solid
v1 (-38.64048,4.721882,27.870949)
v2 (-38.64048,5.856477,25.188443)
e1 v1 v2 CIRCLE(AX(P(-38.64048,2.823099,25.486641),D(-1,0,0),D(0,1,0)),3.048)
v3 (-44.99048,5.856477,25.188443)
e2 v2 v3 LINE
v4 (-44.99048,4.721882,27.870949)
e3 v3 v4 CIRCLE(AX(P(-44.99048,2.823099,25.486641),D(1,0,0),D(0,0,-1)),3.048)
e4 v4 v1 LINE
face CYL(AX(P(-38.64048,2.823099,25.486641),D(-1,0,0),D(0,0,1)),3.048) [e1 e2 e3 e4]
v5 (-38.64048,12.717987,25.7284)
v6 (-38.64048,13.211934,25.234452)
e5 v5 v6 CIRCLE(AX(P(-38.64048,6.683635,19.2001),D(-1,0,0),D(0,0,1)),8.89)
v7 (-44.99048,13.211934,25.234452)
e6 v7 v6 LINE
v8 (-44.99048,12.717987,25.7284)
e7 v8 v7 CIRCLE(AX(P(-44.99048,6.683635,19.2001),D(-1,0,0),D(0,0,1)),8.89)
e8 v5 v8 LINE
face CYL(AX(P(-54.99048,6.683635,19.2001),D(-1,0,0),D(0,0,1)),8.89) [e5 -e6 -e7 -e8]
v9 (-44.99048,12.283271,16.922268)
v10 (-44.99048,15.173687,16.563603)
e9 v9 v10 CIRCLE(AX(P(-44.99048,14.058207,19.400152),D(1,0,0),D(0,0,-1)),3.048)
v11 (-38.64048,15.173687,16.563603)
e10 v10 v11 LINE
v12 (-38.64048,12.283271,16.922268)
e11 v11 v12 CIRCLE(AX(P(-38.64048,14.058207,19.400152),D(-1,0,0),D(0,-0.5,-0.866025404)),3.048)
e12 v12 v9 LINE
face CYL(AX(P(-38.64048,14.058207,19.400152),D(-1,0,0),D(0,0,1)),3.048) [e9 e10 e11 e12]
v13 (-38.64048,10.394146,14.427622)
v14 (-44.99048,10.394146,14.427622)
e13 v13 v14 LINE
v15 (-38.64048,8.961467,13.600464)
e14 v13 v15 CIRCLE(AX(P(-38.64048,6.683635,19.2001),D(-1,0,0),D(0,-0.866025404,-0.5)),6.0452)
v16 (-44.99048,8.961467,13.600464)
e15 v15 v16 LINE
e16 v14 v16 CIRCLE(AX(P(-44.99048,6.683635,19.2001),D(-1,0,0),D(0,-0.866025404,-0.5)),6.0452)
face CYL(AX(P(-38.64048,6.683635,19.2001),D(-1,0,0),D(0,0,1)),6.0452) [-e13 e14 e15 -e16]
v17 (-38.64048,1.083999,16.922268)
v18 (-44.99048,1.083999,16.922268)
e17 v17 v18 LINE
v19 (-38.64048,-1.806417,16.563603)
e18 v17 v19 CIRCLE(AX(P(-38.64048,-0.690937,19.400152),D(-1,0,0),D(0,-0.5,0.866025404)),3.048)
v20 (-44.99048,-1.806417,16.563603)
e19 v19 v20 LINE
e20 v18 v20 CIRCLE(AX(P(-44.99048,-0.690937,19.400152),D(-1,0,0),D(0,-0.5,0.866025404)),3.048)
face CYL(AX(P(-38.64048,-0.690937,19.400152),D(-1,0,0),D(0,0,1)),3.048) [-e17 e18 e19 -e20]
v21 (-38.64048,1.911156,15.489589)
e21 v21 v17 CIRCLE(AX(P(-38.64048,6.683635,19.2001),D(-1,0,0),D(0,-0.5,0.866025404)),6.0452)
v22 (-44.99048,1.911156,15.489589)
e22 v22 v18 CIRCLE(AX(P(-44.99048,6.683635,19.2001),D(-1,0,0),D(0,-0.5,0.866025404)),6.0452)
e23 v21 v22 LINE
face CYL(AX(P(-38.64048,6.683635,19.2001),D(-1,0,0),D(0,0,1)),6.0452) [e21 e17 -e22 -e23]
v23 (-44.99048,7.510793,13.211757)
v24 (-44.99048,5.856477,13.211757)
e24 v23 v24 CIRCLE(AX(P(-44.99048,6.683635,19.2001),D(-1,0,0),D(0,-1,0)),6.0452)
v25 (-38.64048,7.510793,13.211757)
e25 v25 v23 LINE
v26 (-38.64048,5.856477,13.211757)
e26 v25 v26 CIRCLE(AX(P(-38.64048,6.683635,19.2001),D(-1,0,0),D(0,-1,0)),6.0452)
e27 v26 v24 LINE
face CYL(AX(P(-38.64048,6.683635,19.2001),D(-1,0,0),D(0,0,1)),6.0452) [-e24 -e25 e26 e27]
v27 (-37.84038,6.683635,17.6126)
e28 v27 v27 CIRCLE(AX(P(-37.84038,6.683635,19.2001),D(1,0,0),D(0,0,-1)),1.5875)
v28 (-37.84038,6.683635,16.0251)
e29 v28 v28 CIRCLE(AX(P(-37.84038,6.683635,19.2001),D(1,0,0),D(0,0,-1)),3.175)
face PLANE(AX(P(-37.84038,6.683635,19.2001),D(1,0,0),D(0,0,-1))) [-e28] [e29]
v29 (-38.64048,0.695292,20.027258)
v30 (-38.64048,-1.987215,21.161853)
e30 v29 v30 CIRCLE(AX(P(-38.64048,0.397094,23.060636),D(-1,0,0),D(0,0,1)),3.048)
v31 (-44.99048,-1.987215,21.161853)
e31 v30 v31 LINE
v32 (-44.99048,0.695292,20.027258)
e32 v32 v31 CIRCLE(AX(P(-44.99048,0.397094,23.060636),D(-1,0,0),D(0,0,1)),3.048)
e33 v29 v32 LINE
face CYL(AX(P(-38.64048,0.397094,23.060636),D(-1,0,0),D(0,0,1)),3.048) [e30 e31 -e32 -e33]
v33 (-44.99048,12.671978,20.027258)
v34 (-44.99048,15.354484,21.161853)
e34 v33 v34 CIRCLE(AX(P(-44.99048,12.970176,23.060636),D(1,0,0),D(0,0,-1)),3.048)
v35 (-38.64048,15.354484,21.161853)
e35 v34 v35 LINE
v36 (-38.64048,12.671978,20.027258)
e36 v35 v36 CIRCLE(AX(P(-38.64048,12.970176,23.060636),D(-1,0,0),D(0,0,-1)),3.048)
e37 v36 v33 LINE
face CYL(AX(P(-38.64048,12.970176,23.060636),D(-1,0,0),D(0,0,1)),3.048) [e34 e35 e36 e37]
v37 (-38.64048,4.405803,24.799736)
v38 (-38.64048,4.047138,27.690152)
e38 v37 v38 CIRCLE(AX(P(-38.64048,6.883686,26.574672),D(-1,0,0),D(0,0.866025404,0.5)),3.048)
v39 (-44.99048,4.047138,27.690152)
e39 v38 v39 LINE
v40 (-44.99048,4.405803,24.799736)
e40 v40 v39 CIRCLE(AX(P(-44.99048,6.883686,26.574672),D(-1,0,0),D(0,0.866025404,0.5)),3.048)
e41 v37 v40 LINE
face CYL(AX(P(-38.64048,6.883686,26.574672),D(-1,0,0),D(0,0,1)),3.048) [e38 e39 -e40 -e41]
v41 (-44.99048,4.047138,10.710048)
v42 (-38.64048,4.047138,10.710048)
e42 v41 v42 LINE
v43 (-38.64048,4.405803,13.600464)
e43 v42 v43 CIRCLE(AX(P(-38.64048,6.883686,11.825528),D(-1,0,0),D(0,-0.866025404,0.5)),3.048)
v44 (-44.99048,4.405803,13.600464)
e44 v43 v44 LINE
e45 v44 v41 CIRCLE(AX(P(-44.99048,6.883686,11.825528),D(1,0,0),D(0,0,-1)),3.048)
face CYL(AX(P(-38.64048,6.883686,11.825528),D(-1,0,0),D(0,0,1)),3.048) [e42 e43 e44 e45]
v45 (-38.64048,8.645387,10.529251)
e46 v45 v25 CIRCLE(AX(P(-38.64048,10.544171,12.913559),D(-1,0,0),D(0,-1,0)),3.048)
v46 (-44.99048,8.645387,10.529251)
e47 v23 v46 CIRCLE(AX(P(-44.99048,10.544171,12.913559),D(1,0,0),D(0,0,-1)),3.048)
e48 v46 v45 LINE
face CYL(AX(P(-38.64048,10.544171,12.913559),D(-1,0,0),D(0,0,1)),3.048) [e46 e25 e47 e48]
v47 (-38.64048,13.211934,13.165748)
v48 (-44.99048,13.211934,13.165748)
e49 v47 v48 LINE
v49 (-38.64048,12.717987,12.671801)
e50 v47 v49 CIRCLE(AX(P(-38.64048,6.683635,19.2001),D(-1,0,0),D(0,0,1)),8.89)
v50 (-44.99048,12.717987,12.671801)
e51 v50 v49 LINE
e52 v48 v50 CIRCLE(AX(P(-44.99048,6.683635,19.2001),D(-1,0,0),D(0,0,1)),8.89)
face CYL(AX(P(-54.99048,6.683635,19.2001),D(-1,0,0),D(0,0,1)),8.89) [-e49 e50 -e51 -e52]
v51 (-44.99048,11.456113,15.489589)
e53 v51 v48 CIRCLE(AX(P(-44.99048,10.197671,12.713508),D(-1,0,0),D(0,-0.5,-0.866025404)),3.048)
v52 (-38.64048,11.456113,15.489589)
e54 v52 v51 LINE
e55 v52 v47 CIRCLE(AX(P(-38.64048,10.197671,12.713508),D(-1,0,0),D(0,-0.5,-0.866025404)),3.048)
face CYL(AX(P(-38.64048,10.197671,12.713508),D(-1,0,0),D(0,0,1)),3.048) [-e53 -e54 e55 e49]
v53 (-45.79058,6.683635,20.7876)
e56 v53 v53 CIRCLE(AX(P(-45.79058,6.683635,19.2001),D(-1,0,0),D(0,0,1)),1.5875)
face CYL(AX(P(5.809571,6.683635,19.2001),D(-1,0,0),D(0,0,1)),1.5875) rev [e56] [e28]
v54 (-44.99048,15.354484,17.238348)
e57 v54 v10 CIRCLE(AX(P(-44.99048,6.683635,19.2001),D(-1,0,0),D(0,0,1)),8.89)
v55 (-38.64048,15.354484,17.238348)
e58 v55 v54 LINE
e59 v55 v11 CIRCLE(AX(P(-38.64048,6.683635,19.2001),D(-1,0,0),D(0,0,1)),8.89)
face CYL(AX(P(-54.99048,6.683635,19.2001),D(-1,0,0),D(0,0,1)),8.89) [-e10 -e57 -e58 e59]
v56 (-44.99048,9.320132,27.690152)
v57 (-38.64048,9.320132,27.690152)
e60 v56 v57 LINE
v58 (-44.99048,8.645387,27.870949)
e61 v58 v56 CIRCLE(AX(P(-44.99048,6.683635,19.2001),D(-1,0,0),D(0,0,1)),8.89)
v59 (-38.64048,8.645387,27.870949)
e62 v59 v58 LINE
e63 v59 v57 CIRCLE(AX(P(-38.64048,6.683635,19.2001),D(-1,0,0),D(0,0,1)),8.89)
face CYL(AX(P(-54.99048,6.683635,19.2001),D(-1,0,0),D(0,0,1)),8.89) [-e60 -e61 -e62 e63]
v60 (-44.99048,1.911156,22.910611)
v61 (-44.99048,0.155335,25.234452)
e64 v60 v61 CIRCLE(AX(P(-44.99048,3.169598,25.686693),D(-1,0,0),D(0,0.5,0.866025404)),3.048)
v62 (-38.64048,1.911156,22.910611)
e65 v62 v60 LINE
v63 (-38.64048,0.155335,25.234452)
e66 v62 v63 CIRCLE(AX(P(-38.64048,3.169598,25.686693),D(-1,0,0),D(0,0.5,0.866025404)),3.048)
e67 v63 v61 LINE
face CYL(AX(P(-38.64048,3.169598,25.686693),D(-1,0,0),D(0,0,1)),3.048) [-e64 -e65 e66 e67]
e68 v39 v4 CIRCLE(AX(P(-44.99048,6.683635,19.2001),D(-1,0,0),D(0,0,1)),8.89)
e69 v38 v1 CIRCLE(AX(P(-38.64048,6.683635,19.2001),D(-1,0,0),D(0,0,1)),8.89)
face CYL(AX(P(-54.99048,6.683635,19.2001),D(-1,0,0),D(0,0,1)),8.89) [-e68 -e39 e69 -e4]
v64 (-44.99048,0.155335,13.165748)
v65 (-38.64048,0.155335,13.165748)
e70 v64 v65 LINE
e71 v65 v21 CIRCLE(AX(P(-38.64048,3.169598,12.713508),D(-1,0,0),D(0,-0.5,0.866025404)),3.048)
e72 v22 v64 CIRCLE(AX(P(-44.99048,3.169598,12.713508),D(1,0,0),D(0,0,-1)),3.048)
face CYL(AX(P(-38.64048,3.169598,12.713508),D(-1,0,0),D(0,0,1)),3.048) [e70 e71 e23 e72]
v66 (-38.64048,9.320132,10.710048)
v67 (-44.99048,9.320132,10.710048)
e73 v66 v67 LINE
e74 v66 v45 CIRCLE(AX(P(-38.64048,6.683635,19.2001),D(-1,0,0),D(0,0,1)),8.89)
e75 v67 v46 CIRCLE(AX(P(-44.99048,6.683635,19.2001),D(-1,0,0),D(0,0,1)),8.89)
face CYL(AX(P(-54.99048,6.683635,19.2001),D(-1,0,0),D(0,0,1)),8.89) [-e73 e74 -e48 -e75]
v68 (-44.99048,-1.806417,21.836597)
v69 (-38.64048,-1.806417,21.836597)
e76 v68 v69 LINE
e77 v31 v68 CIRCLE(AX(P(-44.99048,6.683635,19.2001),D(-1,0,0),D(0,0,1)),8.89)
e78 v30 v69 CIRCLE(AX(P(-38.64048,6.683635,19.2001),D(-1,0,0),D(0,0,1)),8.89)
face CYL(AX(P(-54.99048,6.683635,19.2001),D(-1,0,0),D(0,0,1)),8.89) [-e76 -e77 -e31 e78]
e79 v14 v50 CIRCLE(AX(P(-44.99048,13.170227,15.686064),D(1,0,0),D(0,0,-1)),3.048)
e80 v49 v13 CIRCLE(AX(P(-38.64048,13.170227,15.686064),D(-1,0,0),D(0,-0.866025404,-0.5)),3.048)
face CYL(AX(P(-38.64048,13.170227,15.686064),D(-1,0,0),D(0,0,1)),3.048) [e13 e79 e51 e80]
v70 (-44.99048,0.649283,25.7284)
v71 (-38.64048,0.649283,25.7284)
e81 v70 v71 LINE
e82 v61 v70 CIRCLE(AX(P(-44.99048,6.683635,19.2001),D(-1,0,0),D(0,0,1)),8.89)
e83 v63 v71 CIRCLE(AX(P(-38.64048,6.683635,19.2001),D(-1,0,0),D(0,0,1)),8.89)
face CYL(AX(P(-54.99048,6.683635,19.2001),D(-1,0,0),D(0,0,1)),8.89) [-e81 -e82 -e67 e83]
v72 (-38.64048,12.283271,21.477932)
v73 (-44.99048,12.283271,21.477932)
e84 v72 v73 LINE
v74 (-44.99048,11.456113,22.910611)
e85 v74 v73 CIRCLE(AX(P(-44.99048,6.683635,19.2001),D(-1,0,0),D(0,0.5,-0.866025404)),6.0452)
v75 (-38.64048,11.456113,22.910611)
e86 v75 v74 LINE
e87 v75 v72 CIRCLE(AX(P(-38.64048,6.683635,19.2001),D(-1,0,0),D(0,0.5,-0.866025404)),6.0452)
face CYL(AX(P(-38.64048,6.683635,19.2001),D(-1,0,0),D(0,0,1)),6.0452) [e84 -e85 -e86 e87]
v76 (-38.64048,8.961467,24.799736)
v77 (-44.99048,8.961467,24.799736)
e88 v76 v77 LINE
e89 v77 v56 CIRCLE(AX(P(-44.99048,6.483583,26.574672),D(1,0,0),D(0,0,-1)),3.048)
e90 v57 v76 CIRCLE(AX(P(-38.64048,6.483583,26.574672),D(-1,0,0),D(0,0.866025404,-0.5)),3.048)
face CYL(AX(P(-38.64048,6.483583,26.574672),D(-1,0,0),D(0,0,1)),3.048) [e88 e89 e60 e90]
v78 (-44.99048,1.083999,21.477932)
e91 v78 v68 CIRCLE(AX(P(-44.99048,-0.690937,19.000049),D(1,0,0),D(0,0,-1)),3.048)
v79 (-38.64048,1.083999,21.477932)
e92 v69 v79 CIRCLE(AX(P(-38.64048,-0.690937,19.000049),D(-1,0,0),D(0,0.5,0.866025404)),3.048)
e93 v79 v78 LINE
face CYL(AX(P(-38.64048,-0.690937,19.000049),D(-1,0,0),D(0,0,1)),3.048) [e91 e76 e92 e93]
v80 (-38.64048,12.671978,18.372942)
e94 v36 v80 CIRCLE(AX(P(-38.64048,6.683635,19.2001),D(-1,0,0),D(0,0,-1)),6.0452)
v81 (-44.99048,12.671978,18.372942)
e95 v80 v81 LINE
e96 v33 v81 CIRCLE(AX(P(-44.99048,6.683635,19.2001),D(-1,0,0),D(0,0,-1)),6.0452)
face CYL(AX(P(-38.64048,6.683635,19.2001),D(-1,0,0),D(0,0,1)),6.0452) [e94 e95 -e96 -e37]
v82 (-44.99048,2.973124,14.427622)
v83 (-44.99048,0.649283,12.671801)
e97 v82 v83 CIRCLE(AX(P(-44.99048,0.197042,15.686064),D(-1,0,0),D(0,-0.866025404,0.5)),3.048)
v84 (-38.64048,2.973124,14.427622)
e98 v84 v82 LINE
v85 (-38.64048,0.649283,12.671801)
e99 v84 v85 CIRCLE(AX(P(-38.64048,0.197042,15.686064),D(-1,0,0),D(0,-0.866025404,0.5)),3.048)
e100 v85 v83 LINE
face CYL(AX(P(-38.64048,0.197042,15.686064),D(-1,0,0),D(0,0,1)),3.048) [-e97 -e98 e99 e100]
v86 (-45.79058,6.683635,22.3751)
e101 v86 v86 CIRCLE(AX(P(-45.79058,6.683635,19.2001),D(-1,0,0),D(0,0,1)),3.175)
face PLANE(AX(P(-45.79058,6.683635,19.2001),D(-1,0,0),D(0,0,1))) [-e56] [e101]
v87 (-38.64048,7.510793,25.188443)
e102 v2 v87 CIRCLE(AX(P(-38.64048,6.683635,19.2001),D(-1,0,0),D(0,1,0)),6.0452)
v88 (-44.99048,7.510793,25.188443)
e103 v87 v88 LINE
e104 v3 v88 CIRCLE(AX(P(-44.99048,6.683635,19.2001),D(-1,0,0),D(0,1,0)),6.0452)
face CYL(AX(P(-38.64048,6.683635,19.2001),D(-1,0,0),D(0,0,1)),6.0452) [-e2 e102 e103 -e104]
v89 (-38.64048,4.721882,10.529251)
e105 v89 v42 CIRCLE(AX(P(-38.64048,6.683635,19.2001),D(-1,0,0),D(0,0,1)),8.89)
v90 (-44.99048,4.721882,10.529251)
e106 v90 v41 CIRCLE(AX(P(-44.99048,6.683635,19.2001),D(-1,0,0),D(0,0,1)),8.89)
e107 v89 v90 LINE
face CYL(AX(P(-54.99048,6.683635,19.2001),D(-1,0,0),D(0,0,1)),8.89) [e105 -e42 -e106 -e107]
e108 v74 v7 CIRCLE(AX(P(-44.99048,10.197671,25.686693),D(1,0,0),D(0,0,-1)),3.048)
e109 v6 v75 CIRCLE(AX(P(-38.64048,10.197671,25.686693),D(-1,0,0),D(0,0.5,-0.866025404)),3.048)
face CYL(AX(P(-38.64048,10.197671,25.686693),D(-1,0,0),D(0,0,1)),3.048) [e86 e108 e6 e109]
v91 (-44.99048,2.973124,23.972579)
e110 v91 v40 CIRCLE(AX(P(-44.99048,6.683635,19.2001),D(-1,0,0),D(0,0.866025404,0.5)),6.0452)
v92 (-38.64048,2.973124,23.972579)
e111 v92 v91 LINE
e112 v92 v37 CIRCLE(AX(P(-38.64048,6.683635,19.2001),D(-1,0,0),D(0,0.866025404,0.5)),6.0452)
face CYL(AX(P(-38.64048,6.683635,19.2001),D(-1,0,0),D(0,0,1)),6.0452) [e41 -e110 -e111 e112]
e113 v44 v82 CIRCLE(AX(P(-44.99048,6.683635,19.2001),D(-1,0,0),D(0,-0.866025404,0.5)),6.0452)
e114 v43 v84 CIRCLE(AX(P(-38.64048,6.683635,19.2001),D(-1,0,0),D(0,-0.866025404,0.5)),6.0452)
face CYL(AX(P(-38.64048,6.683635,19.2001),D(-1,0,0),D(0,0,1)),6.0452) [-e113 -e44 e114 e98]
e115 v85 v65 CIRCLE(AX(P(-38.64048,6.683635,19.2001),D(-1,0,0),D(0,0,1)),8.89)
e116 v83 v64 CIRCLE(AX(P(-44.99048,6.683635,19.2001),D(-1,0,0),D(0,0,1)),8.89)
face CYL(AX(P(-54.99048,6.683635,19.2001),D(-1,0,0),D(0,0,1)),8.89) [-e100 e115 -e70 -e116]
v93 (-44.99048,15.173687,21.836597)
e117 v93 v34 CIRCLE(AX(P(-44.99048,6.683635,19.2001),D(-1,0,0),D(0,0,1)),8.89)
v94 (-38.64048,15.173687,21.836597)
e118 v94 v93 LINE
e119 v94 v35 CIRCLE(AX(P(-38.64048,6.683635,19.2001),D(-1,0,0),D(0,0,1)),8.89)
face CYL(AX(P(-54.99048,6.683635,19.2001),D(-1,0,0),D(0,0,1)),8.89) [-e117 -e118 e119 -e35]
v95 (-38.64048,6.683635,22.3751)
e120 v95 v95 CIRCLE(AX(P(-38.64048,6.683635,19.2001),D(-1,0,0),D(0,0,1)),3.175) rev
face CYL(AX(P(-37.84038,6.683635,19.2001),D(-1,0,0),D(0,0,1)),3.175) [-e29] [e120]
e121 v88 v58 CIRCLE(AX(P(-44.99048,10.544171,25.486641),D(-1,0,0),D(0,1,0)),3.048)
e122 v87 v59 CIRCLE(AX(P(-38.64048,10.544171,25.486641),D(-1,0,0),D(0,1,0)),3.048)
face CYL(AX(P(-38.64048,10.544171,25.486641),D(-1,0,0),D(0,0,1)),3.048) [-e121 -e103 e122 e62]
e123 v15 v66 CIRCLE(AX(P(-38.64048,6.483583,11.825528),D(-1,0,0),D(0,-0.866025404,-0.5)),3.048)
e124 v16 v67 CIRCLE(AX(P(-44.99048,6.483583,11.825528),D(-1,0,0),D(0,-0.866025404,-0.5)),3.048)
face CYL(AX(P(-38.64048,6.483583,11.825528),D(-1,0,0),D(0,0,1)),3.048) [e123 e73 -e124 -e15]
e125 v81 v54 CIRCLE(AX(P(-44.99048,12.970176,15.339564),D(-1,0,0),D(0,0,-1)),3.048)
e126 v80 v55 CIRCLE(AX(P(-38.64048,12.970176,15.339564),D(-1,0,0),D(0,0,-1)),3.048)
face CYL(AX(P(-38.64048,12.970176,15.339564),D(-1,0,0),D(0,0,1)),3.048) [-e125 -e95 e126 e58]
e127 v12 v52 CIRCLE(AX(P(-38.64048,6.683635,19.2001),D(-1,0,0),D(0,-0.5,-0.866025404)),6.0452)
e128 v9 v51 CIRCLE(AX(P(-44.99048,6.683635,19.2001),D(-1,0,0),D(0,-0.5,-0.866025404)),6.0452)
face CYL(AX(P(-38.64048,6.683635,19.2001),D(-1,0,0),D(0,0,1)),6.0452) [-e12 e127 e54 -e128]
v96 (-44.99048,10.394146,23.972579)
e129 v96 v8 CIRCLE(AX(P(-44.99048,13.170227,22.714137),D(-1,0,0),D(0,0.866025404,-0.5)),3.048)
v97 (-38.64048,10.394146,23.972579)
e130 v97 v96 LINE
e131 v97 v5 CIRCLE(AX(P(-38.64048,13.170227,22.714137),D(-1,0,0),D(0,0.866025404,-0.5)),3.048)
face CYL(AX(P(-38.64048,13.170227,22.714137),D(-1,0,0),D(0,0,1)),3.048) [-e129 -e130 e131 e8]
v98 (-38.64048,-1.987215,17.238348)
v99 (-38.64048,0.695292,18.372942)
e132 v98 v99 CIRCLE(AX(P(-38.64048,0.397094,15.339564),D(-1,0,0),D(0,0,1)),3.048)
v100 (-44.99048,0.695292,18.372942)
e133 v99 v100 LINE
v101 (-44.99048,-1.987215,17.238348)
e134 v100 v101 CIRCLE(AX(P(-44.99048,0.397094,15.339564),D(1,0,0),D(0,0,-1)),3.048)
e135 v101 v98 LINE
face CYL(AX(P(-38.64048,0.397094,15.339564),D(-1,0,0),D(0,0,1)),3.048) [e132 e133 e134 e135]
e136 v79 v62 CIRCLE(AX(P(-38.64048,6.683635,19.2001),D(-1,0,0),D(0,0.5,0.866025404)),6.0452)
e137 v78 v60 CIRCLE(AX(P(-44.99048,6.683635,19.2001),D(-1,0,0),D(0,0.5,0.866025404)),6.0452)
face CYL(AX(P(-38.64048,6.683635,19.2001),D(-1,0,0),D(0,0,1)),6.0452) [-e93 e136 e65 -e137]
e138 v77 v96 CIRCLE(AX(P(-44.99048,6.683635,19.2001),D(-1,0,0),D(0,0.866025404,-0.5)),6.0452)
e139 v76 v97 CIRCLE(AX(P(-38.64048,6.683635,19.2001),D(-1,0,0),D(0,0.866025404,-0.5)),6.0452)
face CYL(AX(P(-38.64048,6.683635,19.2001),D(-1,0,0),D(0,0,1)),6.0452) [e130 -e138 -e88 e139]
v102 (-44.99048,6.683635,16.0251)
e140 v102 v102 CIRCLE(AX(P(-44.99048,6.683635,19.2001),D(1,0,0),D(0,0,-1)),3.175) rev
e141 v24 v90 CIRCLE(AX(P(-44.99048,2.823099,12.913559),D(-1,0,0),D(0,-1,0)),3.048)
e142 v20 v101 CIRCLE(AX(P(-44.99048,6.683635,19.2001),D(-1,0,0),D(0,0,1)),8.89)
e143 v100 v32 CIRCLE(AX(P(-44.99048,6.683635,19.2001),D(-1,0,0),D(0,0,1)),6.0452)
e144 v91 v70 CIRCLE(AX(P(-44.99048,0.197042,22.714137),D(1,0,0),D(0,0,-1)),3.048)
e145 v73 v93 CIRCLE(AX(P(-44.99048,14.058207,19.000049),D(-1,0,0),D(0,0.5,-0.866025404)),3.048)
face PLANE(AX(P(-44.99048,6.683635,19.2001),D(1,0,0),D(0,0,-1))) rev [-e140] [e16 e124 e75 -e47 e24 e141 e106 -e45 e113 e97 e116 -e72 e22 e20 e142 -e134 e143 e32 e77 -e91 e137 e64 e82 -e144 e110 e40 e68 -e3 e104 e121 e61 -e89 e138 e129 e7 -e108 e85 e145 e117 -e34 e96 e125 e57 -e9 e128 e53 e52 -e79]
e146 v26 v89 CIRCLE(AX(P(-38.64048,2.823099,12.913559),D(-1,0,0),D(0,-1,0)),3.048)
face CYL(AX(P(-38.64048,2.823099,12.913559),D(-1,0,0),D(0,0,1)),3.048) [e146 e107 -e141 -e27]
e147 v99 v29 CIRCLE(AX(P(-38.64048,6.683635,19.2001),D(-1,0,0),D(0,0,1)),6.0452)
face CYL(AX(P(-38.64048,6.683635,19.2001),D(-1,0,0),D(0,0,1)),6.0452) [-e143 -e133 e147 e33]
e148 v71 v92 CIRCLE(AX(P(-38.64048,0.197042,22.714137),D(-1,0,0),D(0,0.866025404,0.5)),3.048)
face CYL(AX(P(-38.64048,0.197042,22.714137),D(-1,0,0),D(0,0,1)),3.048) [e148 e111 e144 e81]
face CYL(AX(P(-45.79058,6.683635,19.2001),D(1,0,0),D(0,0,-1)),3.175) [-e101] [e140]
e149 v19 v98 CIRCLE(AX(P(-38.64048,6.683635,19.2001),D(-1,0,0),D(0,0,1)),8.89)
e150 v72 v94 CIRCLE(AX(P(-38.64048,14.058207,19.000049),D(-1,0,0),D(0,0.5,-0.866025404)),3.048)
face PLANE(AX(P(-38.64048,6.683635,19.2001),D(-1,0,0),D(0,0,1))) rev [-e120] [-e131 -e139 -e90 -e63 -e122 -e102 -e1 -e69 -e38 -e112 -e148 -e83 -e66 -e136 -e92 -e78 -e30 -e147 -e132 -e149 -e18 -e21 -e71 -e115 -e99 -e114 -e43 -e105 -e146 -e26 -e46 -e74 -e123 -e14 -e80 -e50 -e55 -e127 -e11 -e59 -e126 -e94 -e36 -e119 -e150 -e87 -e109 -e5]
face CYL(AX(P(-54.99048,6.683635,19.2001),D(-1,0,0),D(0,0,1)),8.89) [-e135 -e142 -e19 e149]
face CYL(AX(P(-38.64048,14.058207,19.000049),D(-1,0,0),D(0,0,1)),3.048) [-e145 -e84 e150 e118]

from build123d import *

# Parameters (mm, degrees)
SPUR_START             = -44.990479754
SPUR_GEAR_AI_OUTLINE_R = 1.5875
SPUR_GEAR_AI_DEPTH     = 6.35
SKETCH1_R              = 3.175
SKETCH1_R_2            = 1.5875
BOSS_EXTRUDE1_DEPTH    = 0.8001
BOSS_EXTRUDE2_START    = 0.8001
SKETCH2_R              = 3.175
SKETCH2_R_2            = 1.5875
BOSS_EXTRUDE2_DEPTH    = 0.8001


# Read off the part's stored shape, not the designer's step: spur gear_ai
with BuildPart() as part:
    # spur gear_ai outline → spur gear_ai (new body)
    with BuildSketch(Plane.YZ.offset(SPUR_START)):
        with BuildLine():
            ThreePointArc((12.717986851, 12.671800633), (12.969814044, 12.913920885), (13.211934296, 13.165748078))
            ThreePointArc((13.211934296, 13.165748078), (12.629555475, 14.550963045), (11.456113125, 15.489588981))
            ThreePointArc((11.456113125, 15.489588981), (11.91893153, 16.17750017), (12.283270893, 16.92226826))
            ThreePointArc((12.283270893, 16.92226826), (13.682865973, 16.375350343), (15.173686734, 16.563602973))
            ThreePointArc((15.173686734, 16.563602973), (15.270715355, 16.899198858), (15.354484047, 17.238347731))
            ThreePointArc((15.354484047, 17.238347731), (14.15752171, 18.146789672), (12.671977858, 18.372942402))
            ThreePointArc((12.671977858, 18.372942402), (12.728834759, 19.20010017), (12.671977858, 20.027257937))
            ThreePointArc((12.671977858, 20.027257937), (14.15752171, 20.253410667), (15.354484047, 21.161852608))
            ThreePointArc((15.354484047, 21.161852608), (15.270715355, 21.501001481), (15.173686734, 21.836597366))
            ThreePointArc((15.173686734, 21.836597366), (13.682865973, 22.024849997), (12.283270893, 21.477932079))
            ThreePointArc((12.283270893, 21.477932079), (11.91893153, 22.222700169), (11.456113125, 22.910611358))
            ThreePointArc((11.456113125, 22.910611358), (12.629555475, 23.849237294), (13.211934296, 25.234452261))
            ThreePointArc((13.211934296, 25.234452261), (12.969814044, 25.486279454), (12.717986851, 25.728399706))
            ThreePointArc((12.717986851, 25.728399706), (11.332771884, 25.146020886), (10.394145948, 23.972578536))
            ThreePointArc((10.394145948, 23.972578536), (9.706234759, 24.43539694), (8.961466669, 24.799736303))
            ThreePointArc((8.961466669, 24.799736303), (9.508384586, 26.199331383), (9.320131956, 27.690152144))
            ThreePointArc((9.320131956, 27.690152144), (8.98453607, 27.787180765), (8.645387197, 27.870949457))
            ThreePointArc((8.645387197, 27.870949457), (7.736945256, 26.673987121), (7.510792527, 25.188443268))
            ThreePointArc((7.510792527, 25.188443268), (6.68363476, 25.24530017), (5.856476992, 25.188443268))
            ThreePointArc((5.856476992, 25.188443268), (5.630324262, 26.673987121), (4.721882321, 27.870949457))
            ThreePointArc((4.721882321, 27.870949457), (4.382733448, 27.787180765), (4.047137563, 27.690152144))
            ThreePointArc((4.047137563, 27.690152144), (3.858884932, 26.199331383), (4.405802849, 24.799736303))
            ThreePointArc((4.405802849, 24.799736303), (3.661034759, 24.43539694), (2.97312357, 23.972578536))
            ThreePointArc((2.97312357, 23.972578536), (2.034497635, 25.146020886), (0.649282668, 25.728399706))
            ThreePointArc((0.649282668, 25.728399706), (0.397455474, 25.486279454), (0.155335223, 25.234452261))
            ThreePointArc((0.155335223, 25.234452261), (0.737714043, 23.849237294), (1.911156393, 22.910611358))
            ThreePointArc((1.911156393, 22.910611358), (1.448337988, 22.222700169), (1.083998625, 21.477932079))
            ThreePointArc((1.083998625, 21.477932079), (-0.315596455, 22.024849997), (-1.806417216, 21.836597366))
            ThreePointArc((-1.806417216, 21.836597366), (-1.903445837, 21.501001481), (-1.987214529, 21.161852608))
            ThreePointArc((-1.987214529, 21.161852608), (-0.790252192, 20.253410667), (0.695291661, 20.027257937))
            ThreePointArc((0.695291661, 20.027257937), (0.638434759, 19.20010017), (0.695291661, 18.372942402))
            ThreePointArc((0.695291661, 18.372942402), (-0.790252192, 18.146789672), (-1.987214529, 17.238347731))
            ThreePointArc((-1.987214529, 17.238347731), (-1.903445837, 16.899198858), (-1.806417216, 16.563602973))
            ThreePointArc((-1.806417216, 16.563602973), (-0.315596455, 16.375350343), (1.083998625, 16.92226826))
            ThreePointArc((1.083998625, 16.92226826), (1.448337988, 16.17750017), (1.911156393, 15.489588981))
            ThreePointArc((1.911156393, 15.489588981), (0.737714043, 14.550963045), (0.155335223, 13.165748078))
            ThreePointArc((0.155335223, 13.165748078), (0.397455474, 12.913920884), (0.649282668, 12.671800633))
            ThreePointArc((0.649282668, 12.671800633), (2.034497635, 13.254179453), (2.97312357, 14.427621803))
            ThreePointArc((2.97312357, 14.427621803), (3.661034759, 13.964803399), (4.405802849, 13.600464036))
            ThreePointArc((4.405802849, 13.600464036), (3.858884932, 12.200868956), (4.047137563, 10.710048195))
            ThreePointArc((4.047137563, 10.710048195), (4.382733448, 10.613019574), (4.721882321, 10.529250882))
            ThreePointArc((4.721882321, 10.529250882), (5.630324262, 11.726213218), (5.856476992, 13.211757071))
            ThreePointArc((5.856476992, 13.211757071), (6.68363476, 13.15490017), (7.510792527, 13.211757071))
            ThreePointArc((7.510792527, 13.211757071), (7.736945256, 11.726213218), (8.645387197, 10.529250882))
            ThreePointArc((8.645387197, 10.529250882), (8.98453607, 10.613019574), (9.320131956, 10.710048195))
            ThreePointArc((9.320131956, 10.710048195), (9.508384586, 12.200868956), (8.961466669, 13.600464036))
            ThreePointArc((8.961466669, 13.600464036), (9.706234759, 13.964803399), (10.394145948, 14.427621803))
            ThreePointArc((10.394145948, 14.427621803), (11.332771884, 13.254179453), (12.717986851, 12.671800633))
        make_face()
        with Locations((6.683634759, 19.20010017)):
            Circle(SPUR_GEAR_AI_OUTLINE_R, mode=Mode.SUBTRACT)
    extrude(amount=SPUR_GEAR_AI_DEPTH)

    # Sketch1 → Boss-Extrude1 (add)
    with BuildSketch(Plane(origin=(-38.640479754, 0, 0), x_dir=(0, 0, -1), z_dir=(1, 0, 0))):
        with Locations(Location((-19.20010017, 6.683634759, 0), (0, 0, 180))):
            Circle(SKETCH1_R)
        with Locations((-19.20010017, 6.683634759)):
            Circle(SKETCH1_R_2, mode=Mode.SUBTRACT)
    extrude(amount=BOSS_EXTRUDE1_DEPTH)

    # Sketch2 → Boss-Extrude2 (add)
    with BuildSketch(Plane.ZY.offset(44.990479754).offset(BOSS_EXTRUDE2_START)):
        with Locations((19.20010017, 6.683634759)):
            Circle(SKETCH2_R)
        with Locations((19.20010017, 6.683634759)):
            Circle(SKETCH2_R_2, mode=Mode.SUBTRACT)
    extrude(amount=-BOSS_EXTRUDE2_DEPTH)


solid = part.part
